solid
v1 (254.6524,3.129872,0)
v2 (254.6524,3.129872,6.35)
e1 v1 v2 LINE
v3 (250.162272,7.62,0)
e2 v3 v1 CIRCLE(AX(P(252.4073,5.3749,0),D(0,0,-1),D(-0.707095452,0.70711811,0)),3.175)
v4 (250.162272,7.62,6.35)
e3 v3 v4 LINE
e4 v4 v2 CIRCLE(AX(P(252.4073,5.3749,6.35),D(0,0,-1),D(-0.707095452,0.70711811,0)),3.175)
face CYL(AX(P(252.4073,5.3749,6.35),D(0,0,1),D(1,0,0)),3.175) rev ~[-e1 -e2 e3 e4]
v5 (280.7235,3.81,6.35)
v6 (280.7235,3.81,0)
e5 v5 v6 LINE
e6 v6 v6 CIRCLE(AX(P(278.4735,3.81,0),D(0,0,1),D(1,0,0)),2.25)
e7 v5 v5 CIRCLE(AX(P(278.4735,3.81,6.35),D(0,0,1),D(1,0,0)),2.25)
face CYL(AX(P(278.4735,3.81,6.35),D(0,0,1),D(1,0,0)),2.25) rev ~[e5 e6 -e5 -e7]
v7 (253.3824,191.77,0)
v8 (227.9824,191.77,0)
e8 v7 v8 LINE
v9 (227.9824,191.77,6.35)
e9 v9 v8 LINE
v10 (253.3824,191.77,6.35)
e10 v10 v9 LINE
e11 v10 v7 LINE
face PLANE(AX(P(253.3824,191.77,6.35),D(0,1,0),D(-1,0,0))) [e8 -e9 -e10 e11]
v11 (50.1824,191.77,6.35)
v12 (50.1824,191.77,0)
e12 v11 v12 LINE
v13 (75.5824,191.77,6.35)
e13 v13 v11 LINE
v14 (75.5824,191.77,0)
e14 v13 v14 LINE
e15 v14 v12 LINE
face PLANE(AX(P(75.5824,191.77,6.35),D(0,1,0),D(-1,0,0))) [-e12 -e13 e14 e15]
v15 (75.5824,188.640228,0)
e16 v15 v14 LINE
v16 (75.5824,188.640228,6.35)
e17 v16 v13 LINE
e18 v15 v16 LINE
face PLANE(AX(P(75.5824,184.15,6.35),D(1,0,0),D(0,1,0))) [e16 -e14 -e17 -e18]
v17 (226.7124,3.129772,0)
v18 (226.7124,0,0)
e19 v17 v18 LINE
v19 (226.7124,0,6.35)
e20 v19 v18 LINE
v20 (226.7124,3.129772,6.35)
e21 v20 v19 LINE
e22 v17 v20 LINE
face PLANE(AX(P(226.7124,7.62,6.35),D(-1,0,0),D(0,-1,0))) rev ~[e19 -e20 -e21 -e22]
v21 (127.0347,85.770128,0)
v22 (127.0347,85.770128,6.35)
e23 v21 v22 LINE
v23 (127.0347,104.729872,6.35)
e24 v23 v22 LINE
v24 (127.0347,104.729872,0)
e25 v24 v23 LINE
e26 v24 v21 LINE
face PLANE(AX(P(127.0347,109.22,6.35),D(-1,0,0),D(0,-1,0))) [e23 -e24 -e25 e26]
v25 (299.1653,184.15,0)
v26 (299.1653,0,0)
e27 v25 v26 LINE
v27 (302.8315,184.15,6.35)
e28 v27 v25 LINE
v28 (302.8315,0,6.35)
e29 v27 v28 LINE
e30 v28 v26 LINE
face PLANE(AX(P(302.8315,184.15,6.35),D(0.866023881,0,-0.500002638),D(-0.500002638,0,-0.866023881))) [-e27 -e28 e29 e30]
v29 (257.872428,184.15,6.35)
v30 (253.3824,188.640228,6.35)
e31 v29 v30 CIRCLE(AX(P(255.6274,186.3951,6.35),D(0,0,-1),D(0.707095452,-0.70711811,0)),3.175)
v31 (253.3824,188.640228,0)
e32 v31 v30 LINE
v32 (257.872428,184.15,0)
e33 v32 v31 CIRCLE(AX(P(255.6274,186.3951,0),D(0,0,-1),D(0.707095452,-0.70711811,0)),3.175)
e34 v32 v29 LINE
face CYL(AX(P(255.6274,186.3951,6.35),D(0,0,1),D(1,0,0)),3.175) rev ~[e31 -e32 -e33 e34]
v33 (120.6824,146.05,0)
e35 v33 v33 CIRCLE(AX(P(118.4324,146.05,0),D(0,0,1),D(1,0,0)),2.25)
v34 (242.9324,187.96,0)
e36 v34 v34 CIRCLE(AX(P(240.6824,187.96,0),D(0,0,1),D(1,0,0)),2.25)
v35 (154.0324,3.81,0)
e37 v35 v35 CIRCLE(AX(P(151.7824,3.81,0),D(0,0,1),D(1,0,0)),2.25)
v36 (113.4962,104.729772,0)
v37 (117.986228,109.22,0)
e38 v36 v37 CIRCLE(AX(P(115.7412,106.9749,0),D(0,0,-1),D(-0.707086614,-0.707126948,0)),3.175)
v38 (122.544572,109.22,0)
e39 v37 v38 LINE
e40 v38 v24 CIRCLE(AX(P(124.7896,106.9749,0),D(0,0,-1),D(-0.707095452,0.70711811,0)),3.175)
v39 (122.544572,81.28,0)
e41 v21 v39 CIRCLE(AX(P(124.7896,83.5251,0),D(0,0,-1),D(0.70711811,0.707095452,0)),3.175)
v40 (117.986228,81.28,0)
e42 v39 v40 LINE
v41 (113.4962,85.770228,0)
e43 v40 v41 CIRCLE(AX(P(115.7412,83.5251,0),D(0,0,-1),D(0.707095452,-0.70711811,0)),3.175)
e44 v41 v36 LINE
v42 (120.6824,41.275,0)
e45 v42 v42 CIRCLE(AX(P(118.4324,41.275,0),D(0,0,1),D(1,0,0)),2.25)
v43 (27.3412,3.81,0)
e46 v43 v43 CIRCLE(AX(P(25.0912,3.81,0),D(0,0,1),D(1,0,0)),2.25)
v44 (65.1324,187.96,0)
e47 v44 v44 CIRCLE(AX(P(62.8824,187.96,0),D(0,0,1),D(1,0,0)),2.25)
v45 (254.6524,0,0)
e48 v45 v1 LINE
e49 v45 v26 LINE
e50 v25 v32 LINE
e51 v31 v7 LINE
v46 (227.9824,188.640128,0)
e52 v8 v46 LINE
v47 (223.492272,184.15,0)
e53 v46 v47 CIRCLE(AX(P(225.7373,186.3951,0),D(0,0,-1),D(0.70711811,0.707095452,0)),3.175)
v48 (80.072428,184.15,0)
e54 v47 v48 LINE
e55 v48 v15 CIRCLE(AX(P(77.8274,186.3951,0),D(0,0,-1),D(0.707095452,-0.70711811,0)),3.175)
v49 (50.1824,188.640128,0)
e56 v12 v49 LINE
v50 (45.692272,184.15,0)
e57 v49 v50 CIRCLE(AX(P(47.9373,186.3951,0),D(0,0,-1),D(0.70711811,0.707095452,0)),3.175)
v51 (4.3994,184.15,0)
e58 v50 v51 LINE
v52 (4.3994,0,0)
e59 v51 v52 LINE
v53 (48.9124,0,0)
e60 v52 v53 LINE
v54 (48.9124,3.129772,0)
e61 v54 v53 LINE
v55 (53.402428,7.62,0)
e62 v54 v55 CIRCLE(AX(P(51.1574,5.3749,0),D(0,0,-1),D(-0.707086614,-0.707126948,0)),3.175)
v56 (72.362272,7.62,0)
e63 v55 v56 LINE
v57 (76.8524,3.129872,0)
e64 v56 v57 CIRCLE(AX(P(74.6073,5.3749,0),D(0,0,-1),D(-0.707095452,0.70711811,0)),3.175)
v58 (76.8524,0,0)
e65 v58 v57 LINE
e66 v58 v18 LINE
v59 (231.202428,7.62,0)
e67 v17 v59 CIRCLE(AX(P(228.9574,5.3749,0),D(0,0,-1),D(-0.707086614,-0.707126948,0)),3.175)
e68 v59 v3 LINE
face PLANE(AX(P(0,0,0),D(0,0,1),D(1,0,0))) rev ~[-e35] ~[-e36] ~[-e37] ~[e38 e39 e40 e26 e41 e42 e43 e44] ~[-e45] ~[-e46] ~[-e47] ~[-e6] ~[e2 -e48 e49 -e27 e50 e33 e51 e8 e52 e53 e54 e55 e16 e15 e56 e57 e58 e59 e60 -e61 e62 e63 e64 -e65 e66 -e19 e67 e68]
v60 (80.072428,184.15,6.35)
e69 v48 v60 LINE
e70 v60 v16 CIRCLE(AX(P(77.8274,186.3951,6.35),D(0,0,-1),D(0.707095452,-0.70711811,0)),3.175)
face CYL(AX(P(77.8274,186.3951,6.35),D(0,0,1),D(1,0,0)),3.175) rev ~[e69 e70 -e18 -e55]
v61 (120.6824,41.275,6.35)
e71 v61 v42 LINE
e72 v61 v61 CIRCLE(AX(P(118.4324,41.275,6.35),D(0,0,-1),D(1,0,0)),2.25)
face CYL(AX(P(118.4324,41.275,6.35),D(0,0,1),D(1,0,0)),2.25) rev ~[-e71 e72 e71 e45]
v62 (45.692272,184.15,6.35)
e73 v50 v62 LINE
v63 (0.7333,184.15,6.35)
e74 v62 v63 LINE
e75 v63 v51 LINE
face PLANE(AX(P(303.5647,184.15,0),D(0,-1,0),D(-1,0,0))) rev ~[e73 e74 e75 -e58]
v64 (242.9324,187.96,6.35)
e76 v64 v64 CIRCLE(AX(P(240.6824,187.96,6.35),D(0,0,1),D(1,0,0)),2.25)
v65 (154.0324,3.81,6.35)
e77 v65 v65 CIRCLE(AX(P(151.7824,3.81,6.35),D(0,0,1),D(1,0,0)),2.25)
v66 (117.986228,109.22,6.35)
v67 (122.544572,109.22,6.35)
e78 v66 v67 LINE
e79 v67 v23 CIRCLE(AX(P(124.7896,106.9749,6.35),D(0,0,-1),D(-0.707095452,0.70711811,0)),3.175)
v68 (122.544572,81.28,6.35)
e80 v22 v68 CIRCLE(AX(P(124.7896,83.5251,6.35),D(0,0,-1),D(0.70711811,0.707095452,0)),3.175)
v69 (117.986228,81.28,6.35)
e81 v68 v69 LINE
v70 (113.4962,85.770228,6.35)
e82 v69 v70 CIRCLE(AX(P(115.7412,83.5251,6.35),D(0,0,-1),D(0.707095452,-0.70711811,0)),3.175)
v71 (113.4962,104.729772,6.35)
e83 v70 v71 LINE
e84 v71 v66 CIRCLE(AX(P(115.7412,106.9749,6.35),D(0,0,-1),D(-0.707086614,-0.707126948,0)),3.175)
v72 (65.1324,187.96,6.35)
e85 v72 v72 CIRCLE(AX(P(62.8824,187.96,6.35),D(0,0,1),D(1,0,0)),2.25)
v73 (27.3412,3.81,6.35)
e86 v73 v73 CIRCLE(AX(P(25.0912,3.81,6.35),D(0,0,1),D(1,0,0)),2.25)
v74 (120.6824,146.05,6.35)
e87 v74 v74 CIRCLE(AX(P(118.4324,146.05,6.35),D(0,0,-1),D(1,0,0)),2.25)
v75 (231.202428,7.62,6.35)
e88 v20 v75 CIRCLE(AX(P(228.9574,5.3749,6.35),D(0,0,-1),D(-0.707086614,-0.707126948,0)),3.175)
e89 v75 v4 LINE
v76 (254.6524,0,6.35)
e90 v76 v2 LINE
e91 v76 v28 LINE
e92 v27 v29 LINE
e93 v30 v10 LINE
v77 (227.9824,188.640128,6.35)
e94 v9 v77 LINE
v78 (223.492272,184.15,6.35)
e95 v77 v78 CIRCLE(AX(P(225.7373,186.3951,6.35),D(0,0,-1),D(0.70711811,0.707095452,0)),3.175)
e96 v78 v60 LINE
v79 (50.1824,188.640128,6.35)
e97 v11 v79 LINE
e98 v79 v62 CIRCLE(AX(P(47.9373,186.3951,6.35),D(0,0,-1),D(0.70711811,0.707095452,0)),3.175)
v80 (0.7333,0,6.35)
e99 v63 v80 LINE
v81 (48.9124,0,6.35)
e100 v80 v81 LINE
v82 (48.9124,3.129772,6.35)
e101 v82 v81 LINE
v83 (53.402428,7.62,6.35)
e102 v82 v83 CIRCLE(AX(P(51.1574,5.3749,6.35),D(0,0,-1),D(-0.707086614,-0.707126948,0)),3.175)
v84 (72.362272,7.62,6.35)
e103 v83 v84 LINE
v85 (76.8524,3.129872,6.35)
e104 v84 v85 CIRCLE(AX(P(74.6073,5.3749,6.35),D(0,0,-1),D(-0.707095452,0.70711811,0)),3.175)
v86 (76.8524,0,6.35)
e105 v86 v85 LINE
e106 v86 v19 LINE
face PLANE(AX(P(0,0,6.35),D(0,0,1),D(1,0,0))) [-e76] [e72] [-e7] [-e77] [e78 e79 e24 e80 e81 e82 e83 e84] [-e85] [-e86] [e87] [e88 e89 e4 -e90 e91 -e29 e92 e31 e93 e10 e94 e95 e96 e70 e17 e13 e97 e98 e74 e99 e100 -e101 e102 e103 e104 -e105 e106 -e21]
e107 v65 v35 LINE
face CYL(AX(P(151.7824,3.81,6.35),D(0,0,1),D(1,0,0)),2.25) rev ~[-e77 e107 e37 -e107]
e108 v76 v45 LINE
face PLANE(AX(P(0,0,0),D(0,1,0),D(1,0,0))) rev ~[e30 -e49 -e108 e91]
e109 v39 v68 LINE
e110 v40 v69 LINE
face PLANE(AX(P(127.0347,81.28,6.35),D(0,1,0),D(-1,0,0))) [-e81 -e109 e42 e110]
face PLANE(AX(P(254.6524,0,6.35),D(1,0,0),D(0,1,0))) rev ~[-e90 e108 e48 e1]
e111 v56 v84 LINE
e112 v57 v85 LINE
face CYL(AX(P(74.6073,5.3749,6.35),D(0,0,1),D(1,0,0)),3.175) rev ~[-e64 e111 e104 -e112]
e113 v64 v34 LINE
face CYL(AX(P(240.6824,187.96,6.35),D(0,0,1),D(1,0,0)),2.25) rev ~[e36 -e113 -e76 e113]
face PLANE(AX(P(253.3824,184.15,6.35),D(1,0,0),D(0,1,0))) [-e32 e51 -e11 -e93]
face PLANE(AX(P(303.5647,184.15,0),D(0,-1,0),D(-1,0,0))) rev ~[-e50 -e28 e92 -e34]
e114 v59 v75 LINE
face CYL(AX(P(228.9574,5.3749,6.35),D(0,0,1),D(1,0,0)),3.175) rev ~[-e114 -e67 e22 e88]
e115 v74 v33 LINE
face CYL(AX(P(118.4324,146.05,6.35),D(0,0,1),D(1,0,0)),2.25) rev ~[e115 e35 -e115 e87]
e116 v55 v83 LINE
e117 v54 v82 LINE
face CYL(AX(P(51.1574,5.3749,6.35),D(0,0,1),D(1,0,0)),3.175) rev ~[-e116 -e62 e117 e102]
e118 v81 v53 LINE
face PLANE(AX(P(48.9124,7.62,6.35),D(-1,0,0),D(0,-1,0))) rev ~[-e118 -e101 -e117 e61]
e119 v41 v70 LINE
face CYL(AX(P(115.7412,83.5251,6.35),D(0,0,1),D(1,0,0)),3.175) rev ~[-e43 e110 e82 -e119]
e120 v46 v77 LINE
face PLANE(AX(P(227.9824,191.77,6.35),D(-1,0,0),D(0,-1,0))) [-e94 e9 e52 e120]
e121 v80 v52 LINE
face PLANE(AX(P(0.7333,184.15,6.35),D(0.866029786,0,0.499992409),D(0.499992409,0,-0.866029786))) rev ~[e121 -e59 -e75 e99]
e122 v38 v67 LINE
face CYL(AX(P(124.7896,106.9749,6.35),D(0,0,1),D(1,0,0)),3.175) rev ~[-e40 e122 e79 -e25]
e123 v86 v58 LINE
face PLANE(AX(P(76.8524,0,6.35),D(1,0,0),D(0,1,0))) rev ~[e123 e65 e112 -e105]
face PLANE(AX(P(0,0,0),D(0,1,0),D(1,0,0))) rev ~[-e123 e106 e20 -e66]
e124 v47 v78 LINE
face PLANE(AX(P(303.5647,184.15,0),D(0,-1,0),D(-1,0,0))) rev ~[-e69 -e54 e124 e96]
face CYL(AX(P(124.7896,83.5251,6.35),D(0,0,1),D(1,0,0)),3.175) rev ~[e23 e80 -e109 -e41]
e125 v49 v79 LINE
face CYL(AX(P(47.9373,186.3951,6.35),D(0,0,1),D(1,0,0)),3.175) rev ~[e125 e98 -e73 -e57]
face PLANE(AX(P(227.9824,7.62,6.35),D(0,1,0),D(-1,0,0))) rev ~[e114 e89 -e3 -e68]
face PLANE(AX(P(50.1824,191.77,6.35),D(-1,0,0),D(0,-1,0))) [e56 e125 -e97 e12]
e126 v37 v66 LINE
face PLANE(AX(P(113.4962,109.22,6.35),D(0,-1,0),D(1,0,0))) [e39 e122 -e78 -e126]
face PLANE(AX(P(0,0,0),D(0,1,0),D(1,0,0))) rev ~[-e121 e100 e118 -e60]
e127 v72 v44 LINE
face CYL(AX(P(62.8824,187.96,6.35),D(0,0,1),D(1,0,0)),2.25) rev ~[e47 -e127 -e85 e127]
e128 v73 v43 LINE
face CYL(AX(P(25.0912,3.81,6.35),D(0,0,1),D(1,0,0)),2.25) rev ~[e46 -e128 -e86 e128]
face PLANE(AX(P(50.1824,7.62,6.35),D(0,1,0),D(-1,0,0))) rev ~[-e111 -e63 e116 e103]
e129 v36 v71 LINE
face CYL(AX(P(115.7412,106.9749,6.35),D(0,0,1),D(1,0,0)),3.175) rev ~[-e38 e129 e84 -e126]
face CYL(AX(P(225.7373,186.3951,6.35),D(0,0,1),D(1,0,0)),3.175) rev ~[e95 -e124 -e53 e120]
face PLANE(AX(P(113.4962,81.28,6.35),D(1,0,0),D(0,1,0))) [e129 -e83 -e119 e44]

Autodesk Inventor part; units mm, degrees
ref_plane "YZ Plane" through (0, 0, 0) normal (1, 0, 0) x (0, 1, 0)
sketch "Sketch1" plane through (0, 0, 0) normal (0, 0, 1) x (1, 0, 0)
  line L0 (0, 0) -> (303.5647, 0)
  line L1 (303.5647, 0) -> (303.5647, 184.15)
  line L2 (303.5647, 184.15) -> (0, 184.15)
  line L3 (0, 184.15) -> (0, 0)
  dimension "d0" = 303.5647
  dimension "d1" = 184.15
extrude "Extrusion1" add sketch "Sketch1" along normal blind 6.35
sketch "Sketch2" plane through (0, 184.15, 0) normal (0, 1, 0) x (1, 0, 0)
  line L0 (0, -6.35) -> (303.5647, -6.35) projected
  line L1 (0, -6.35) -> (3.6662, 0)
  line L2 (3.6662, 0) -> (0, 0)
  line L3 (0, 0) -> (0, -6.35)
  line L4 (0, 0) -> (303.5647, 0) projected
  line L5 (303.5647, 0) -> (303.5647, -6.35) projected
  line L6 (299.8985, 0) -> (303.5647, -6.35)
  line L7 (303.5647, -6.35) -> (303.5647, 0)
  line L8 (303.5647, 0) -> (299.8985, 0)
  dimension "d4" = 30
  dimension "d5" = 30
extrude "Extrusion2" cut sketch "Sketch2" against normal through all contours L3 L2 L1 | L6 L4 L5
ref_plane "Work Plane1" through (3.6662, 92.075, 0) normal (0, -1, 0) x (1, 0, 0)
sketch "Sketch4" plane through (3.6662, 92.075, 0) normal (0, -1, 0) x (1, 0, 0)
  line L0 (0, 0) -> (296.2324, 0) projected
  line L1 (118.4324, 0) -> (129.4309, 6.35) construction
  line L2 (129.4309, 6.35) -> (116.7309, 6.35) construction
  line L3 (-3.6662, 6.35) -> (299.8985, 6.35) projected
  line L4 (118.4324, 0) -> (111.1, 0)
  line L5 (118.0728, 4.0257) -> (111.1, 0) construction
  line L6 (-3.6662, 6.35) -> (0, 0) projected
  line L7 (118.4324, 0) -> (122.0985, 6.35)
  line L8 (111.1, 0) -> (114.7662, 6.35)
  line L9 (122.0985, 6.35) -> (114.7662, 6.35)
  point P0 (-3.6662, 0)
  dimension "d13" = 88.9
  dimension "d14" = 30
  dimension "d15" = 60
  dimension "d16" = 6.35
extrude "Extrusion3" cut sketch "Sketch4" along normal blind 9.525 and the other way blind 15.875 contours L8 L3 L7 L0
sketch "Sketch5" plane through (0, 0, 6.35) normal (0, 0, 1) x (1, 0, 0)
  line L0 (3.6662, 0) -> (299.8985, 0) projected
  line L1 (50.1824, 0) -> (75.5824, 0)
  line L2 (75.5824, 0) -> (75.5824, 7.62)
  line L3 (75.5824, 7.62) -> (50.1824, 7.62)
  line L4 (50.1824, 7.62) -> (50.1824, 0)
  line L5 (227.9824, 0) -> (253.3824, 0)
  line L6 (253.3824, 0) -> (253.3824, 7.62)
  line L7 (253.3824, 7.62) -> (227.9824, 7.62)
  line L8 (227.9824, 7.62) -> (227.9824, 0)
  line L9 (75.5824, 7.62) -> (227.9824, 7.62) construction
  point P0 (0, 0)
  point P1 (151.7824, 7.62)
  point P2 (151.7824, 0)
  dimension "d19" = 25.4
  dimension "d20" = 7.62
  dimension "d21" = 25.4
  dimension "d22" = 7.62
  dimension "d23" = 152.4
extrude "Extrusion4" cut sketch "Sketch5" against normal through all
sketch "Sketch6" plane through (0, 0, 6.35) normal (0, 0, 1) x (1, 0, 0)
  line L0 (299.8985, 184.15) -> (3.6662, 184.15) projected
  line L1 (50.1824, 184.15) -> (75.5824, 184.15)
  line L2 (75.5824, 184.15) -> (75.5824, 191.77)
  line L3 (75.5824, 191.77) -> (50.1824, 191.77)
  line L4 (50.1824, 191.77) -> (50.1824, 184.15)
  line L5 (50.1824, 7.62) -> (75.5824, 7.62) projected
  line L6 (227.9824, 184.15) -> (253.3824, 184.15)
  line L7 (253.3824, 184.15) -> (253.3824, 191.77)
  line L8 (253.3824, 191.77) -> (227.9824, 191.77)
  line L9 (227.9824, 191.77) -> (227.9824, 184.15)
  line L10 (227.9824, 7.62) -> (253.3824, 7.62) projected
  point P0 (0, 0)
  point P1 (62.8824, 191.77)
  point P2 (62.8824, 7.62)
  point P3 (240.6824, 191.77)
  point P4 (240.6824, 7.62)
  dimension "d26" = 25.4
  dimension "d27" = 7.62
  dimension "d28" = 25.4
  dimension "d29" = 7.62
extrude "Extrusion5" add sketch "Sketch6" against normal blind 6.35
ref_plane "Work Plane2" through (125.7647, 92.075, 6.35) normal (-0.5, 0, -0.8660254) x (0, -1, 0)
sketch "Sketch7" plane through (125.7647, 92.075, 6.35) normal (-0.5, 0, -0.8660254) x (0, -1, 0)
  line L0 (-15.875, 6.35) -> (-15.875, 0) projected
  line L1 (-15.875, 3.175) -> (-92.075, 3.175) construction
  line L2 (-92.075, -88.5231) -> (-92.075, 43.4592) projected
  line L3 (9.525, 0) -> (9.525, 6.35) projected
  line L4 (9.525, 3.175) -> (92.075, 3.175) construction
  line L5 (92.075, 43.4592) -> (92.075, -88.5231) projected
  circle A0 centre (-53.975, 3.175) radius 2.25
  circle A1 centre (50.8, 3.175) radius 2.25
  point P0 (92.075, 105.7404)
  dimension "d33" = 4.5
  dimension "d34" = 4.5
extrude "Extrusion6" cut sketch "Sketch7" along normal through all
sketch "Sketch8" plane through (0, 0, 6.35) normal (0, 0, 1) x (1, 0, 0)
  circle A0 centre (62.8824, 187.96) radius 2.25
  circle A1 centre (240.6824, 187.96) radius 2.25
  circle A2 centre (278.4735, 3.81) radius 2.25
  circle A3 centre (151.7824, 3.81) radius 2.25
  circle A4 centre (25.0912, 3.81) radius 2.25
  line L0 (0, 0) -> (50.1824, 0) projected
  line L1 (75.5824, 0) -> (227.9824, 0) projected
  line L2 (253.3824, 0) -> (303.5647, 0) projected
  line L3 (50.1824, 0) -> (50.1824, 7.62) projected
  line L4 (253.3824, 184.15) -> (253.3824, 191.77) projected
  line L5 (75.5824, 191.77) -> (50.1824, 191.77) projected
  line L6 (253.3824, 191.77) -> (227.9824, 191.77) projected
  point P0 (25.0912, 0)
  point P1 (151.7824, 0)
  point P2 (278.4735, 0)
  point P3 (50.1824, 3.81)
  point P4 (253.3824, 187.96)
  point P5 (62.8824, 191.77)
  point P6 (240.6824, 191.77)
  dimension "d37" = 4.5
  dimension "d38" = 4.5
  dimension "d39" = 4.5
  dimension "d40" = 4.5
  dimension "d41" = 4.5
extrude "Extrusion7" cut sketch "Sketch8" against normal through all
sketch "Sketch9" plane through (0, 0, 0) normal (0, 0, -1) x (-1, 0, 0)
  ellipse E0 centre (-118.4324, 41.275) end of major axis (-121.0304, 41.275) minor radius 2.25 projected
  line L0 (-114.7662, 107.95) -> (-114.7662, 82.55) projected
  line L1 (-114.7662, 107.95) -> (-118.4324, 107.95) projected
  line L2 (-118.4324, 82.55) -> (-118.4324, 107.95) projected
  line L3 (-118.4324, 82.55) -> (-114.7662, 82.55) projected
  ellipse E1 centre (-118.4324, 146.05) end of major axis (-121.0304, 146.05) minor radius 2.25 projected
  point P0 (0, 0)
extrude "Extrusion8" cut sketch "Sketch9" along normal through all both and the other way through all
sketch "Sketch10" plane through (0, 0, 6.35) normal (0, 0, 1) x (1, 0, 0)
  ellipse E0 centre (118.4324, 146.05) end of major axis (115.8343, 146.05) minor radius 2.25 (118.4324, 143.8) -> (120.2654, 144.4555) ccw projected
  ellipse E1 centre (122.0985, 146.05) end of major axis (124.6966, 146.05) minor radius 2.25 (120.2654, 144.4555) -> (120.2654, 147.6445) ccw projected
  ellipse E2 centre (118.4324, 146.05) end of major axis (115.8343, 146.05) minor radius 2.25 (120.2654, 147.6445) -> (118.4324, 148.3) ccw projected
  ellipse E3 centre (118.4324, 146.05) end of major axis (121.0304, 146.05) minor radius 2.25 (118.4324, 143.8) -> (118.4324, 148.3) ccw projected
  ellipse E4 centre (118.4324, 41.275) end of major axis (115.8343, 41.275) minor radius 2.25 (118.4324, 39.025) -> (120.2654, 39.6805) ccw projected
  ellipse E5 centre (122.0985, 41.275) end of major axis (124.6966, 41.275) minor radius 2.25 (120.2654, 39.6805) -> (120.2654, 42.8695) ccw projected
  ellipse E6 centre (118.4324, 41.275) end of major axis (115.8343, 41.275) minor radius 2.25 (120.2654, 42.8695) -> (118.4324, 43.525) ccw projected
  ellipse E7 centre (118.4324, 41.275) end of major axis (121.0304, 41.275) minor radius 2.25 (118.4324, 39.025) -> (118.4324, 43.525) ccw projected
  line L0 (125.7647, 107.95) -> (125.7647, 82.55) projected
  line L1 (125.7647, 107.95) -> (122.0985, 107.95) projected
  line L2 (122.0985, 82.55) -> (122.0985, 107.95) projected
  line L3 (122.0985, 82.55) -> (125.7647, 82.55) projected
  point P0 (0, 0)
extrude "Extrusion9" cut sketch "Sketch10" against normal through all contours L0 L3 L2 L1
sketch "Sketch11" plane through (0, 0, 6.35) normal (0, 0, 1) x (1, 0, 0)
  ellipse E0 centre (118.4324, 146.05) end of major axis (115.8343, 146.05) minor radius 2.25 (120.2654, 147.6445) -> (120.2654, 144.4555) ccw projected
  ellipse E1 centre (118.4324, 41.275) end of major axis (115.8343, 41.275) minor radius 2.25 (120.2654, 42.8695) -> (120.2654, 39.6805) ccw projected
  circle A0 centre (118.4324, 41.275) radius 2.25
  circle A1 centre (118.4324, 146.05) radius 2.25
  circle A2 centre (118.4324, 146.05) radius 7.5
  circle A3 centre (118.4324, 41.275) radius 7.5
  point P0 (0, 0)
  dimension "d48" = 4.5
  dimension "d49" = 4.5
  dimension "d50" = 15
  dimension "d51" = 15
extrude "Extrusion10" add sketch "Sketch11" against normal up to surface (6.35 mm away) from surface at 0 contours A1 E0 | A0 E1 | A2 | A3
sketch "Sketch12" plane through (0, 0, 6.35) normal (0, 0, 1) x (1, 0, 0)
  line L0 (3.6662, 0) -> (50.1824, 0) projected
  line L1 (48.9124, 0) -> (76.8524, 0)
  line L2 (76.8524, 0) -> (76.8524, 7.62)
  line L3 (76.8524, 7.62) -> (48.9124, 7.62)
  line L4 (48.9124, 7.62) -> (48.9124, 0)
  line L5 (75.5824, 0) -> (227.9824, 0) projected
  line L6 (226.7124, 0) -> (254.6524, 0)
  line L7 (254.6524, 0) -> (254.6524, 7.62)
  line L8 (254.6524, 7.62) -> (226.7124, 7.62)
  line L9 (226.7124, 7.62) -> (226.7124, 0)
  line L10 (50.1824, 7.62) -> (75.5824, 7.62) projected
  line L11 (227.9824, 7.62) -> (253.3824, 7.62) projected
  line L12 (50.1824, 0) -> (50.1824, 7.62) projected
  line L13 (227.9824, 0) -> (227.9824, 7.62) projected
  line L14 (114.7662, 107.95) -> (125.7647, 107.95) projected
  line L15 (114.7662, 82.55) -> (114.7662, 107.95) projected
  line L16 (125.7647, 82.55) -> (114.7662, 82.55) projected
  line L17 (125.7647, 107.95) -> (125.7647, 82.55) projected
  line L18 (113.4962, 109.22) -> (127.0347, 109.22)
  line L19 (127.0347, 109.22) -> (127.0347, 81.28)
  line L20 (127.0347, 81.28) -> (113.4962, 81.28)
  line L21 (113.4962, 81.28) -> (113.4962, 109.22)
  point P0 (0, 0)
  point P1 (62.8824, 7.62)
  point P2 (240.6824, 7.62)
  dimension "d54" = 1.27
  dimension "d55" = 1.27
  dimension "d56" = 1.27
extrude "Extrusion11" cut sketch "Sketch12" against normal through all contours L4 L3 L12 L0 | L12 L3 L2 L1 | L9 L8 L13 L5 | L13 L8 L7 L6 | L14 L17 L16 L15 | L18 L19 L20 L21
sketch "Sketch13" plane through (0, 0, 6.35) normal (0, 0, 1) x (1, 0, 0)
  line L0 (254.6524, 7.62) -> (254.6524, 0) construction
  line L1 (254.6524, 0) -> (303.5647, 0) construction
  line L2 (303.5647, 0) -> (303.5647, 184.15) construction
  line L3 (303.5647, 184.15) -> (253.3824, 184.15) construction
  line L4 (253.3824, 184.15) -> (253.3824, 191.77) construction
  line L5 (253.3824, 191.77) -> (227.9824, 191.77) construction
  line L6 (227.9824, 191.77) -> (227.9824, 184.15) construction
  line L7 (227.9824, 184.15) -> (75.5824, 184.15) construction
  line L8 (75.5824, 184.15) -> (75.5824, 191.77) construction
  line L9 (75.5824, 191.77) -> (50.1824, 191.77) construction
  line L10 (50.1824, 191.77) -> (50.1824, 184.15) construction
  line L11 (50.1824, 184.15) -> (0, 184.15) construction
  line L12 (0, 184.15) -> (0, 0) construction
  line L13 (0, 0) -> (48.9124, 0) construction
  line L14 (48.9124, 0) -> (48.9124, 7.62) construction
  line L15 (48.9124, 7.62) -> (76.8524, 7.62) construction
  line L16 (76.8524, 7.62) -> (76.8524, 0) construction
  line L17 (76.8524, 0) -> (226.7124, 0) construction
  line L18 (226.7124, 0) -> (226.7124, 7.62) construction
  line L19 (226.7124, 7.62) -> (254.6524, 7.62) construction
  line L20 (113.4962, 81.28) -> (113.4962, 109.22) construction
  line L21 (113.4962, 109.22) -> (127.0347, 109.22) construction
  line L22 (127.0347, 109.22) -> (127.0347, 81.28) construction
  line L23 (127.0347, 81.28) -> (113.4962, 81.28) construction
  circle A0 centre (118.4324, 146.05) radius 2.25 construction
  circle A1 centre (118.4324, 41.275) radius 2.25 construction
  circle A2 centre (25.0912, 3.81) radius 2.25 construction
  circle A3 centre (278.4735, 3.81) radius 2.25 construction
  circle A4 centre (62.8824, 187.96) radius 2.25 construction
  circle A5 centre (240.6824, 187.96) radius 2.25 construction
  circle A6 centre (151.7824, 3.81) radius 2.25 construction
  line L24 (77.8274, 186.3951) -> (225.7373, 186.3951) construction
  line L25 (225.7373, 186.3951) -> (225.7373, 194.0151) construction
  line L26 (225.7373, 194.0151) -> (255.6274, 194.0151) construction
  line L27 (255.6274, 194.0151) -> (255.6274, 186.3951) construction
  line L28 (255.6274, 186.3951) -> (305.8098, 186.3951) construction
  line L29 (305.8098, 186.3951) -> (305.8098, -2.2451) construction
  line L30 (305.8098, -2.2451) -> (252.4073, -2.2451) construction
  line L31 (252.4073, -2.2451) -> (252.4073, 5.3749) construction
  line L32 (252.4073, 5.3749) -> (228.9574, 5.3749) construction
  line L33 (228.9574, 5.3749) -> (228.9574, -2.2451) construction
  line L34 (228.9574, -2.2451) -> (74.6073, -2.2451) construction
  line L35 (74.6073, -2.2451) -> (74.6073, 5.3749) construction
  line L36 (74.6073, 5.3749) -> (51.1574, 5.3749) construction
  line L37 (51.1574, 5.3749) -> (51.1574, -2.2451) construction
  line L38 (51.1574, -2.2451) -> (-2.2451, -2.2451) construction
  line L39 (-2.2451, -2.2451) -> (-2.2451, 186.3951) construction
  line L40 (-2.2451, 186.3951) -> (47.9373, 186.3951) construction
  line L41 (47.9373, 186.3951) -> (47.9373, 194.0151) construction
  line L42 (47.9373, 194.0151) -> (77.8274, 194.0151) construction
  line L43 (77.8274, 194.0151) -> (77.8274, 186.3951) construction
  circle A7 centre (47.9373, 186.3951) radius 3.175
  circle A8 centre (77.8274, 186.3951) radius 3.175
  circle A9 centre (225.7373, 186.3951) radius 3.175
  circle A10 centre (255.6274, 186.3951) radius 3.175
  circle A11 centre (252.4073, 5.3749) radius 3.175
  line L44 (226.7124, 7.62) -> (254.6524, 7.62) projected
  circle A12 centre (228.9574, 5.3749) radius 3.175
  line L45 (48.9124, 7.62) -> (76.8524, 7.62) projected
  circle A13 centre (74.6073, 5.3749) radius 3.175
  circle A14 centre (51.1574, 5.3749) radius 3.175
  line L46 (115.7412, 106.9749) -> (115.7412, 83.5251) construction
  line L47 (115.7412, 83.5251) -> (124.7896, 83.5251) construction
  line L48 (124.7896, 83.5251) -> (124.7896, 106.9749) construction
  line L49 (124.7896, 106.9749) -> (115.7412, 106.9749) construction
  line L50 (113.4962, 109.22) -> (113.4962, 81.28) projected
  circle A15 centre (115.7412, 106.9749) radius 3.175
  circle A16 centre (124.7896, 106.9749) radius 3.175
  line L51 (127.0347, 81.28) -> (127.0347, 109.22) projected
  circle A17 centre (124.7896, 83.5251) radius 3.175
  circle A18 centre (115.7412, 83.5251) radius 3.175
  dimension "d59" = 6.35
  dimension "d60" = 6.35
extrude "Extrusion12" cut sketch "Sketch13" along normal through all both and the other way through all
sketch "Sketch14" plane through (80.0725, 184.15, 0) normal (0, 1, 0) x (1, 0, 0)
  line L0 (-76.4063, 0) -> (-80.0725, -6.35) projected
  line L1 (-80.0725, -6.35) -> (-79.3392, -6.35)
  line L2 (-80.0725, -6.35) -> (-31.1601, -6.35) construction
  line L3 (-79.3392, -6.35) -> (-75.6731, 0)
  line L4 (-76.4063, 0) -> (-31.1601, 0) construction
  line L5 (-75.6731, 0) -> (-76.4063, 0)
  line L6 (174.5799, -6.35) -> (223.4922, -6.35) construction
  line L7 (223.4922, -6.35) -> (222.759, -6.35)
  line L8 (222.759, -6.35) -> (219.0928, 0)
  line L9 (219.8261, 0) -> (177.8, 0) construction
  line L10 (219.0928, 0) -> (219.8261, 0)
  line L11 (223.4922, -6.35) -> (219.8261, 0) projected
  line L12 (219.8261, 0) -> (223.4922, -6.35)
  point P0 (-80.0725, 0)
  dimension "d63" = 0.635
  dimension "d64" = 0.635
extrude "Extrusion13" cut sketch "Sketch14" against normal through all
equation "\"d2\" = Panel_Thickness"
equation "\"d16\" = Panel_Thickness"
equation "\"d20\" = Panel_Thickness + Fit_Tolerance"
equation "\"d22\" = Panel_Thickness + Fit_Tolerance"
equation "\"d27\" = Panel_Thickness + Fit_Tolerance"
equation "\"d29\" = Panel_Thickness + Fit_Tolerance"
equation "\"d30\" = Panel_Thickness"
equation "\"d35\" = Panel_Thickness"
equation "\"d42\" = Panel_Thickness"
equation "\"d46\" = Panel_Thickness"
equation "\"d52\" = Panel_Thickness"
equation "\"d54\" = Fit_Tolerance"
equation "\"d55\" = Fit_Tolerance"
equation "\"d56\" = Fit_Tolerance"
equation "\"d57\" = Panel_Thickness"
equation "\"d59\" = Tool_Dia"
equation "\"d60\" = Tool_Dia"
equation "\"d63\" = 0.5 * Fit_Tolerance"
equation "\"d64\" = 0.5 * Fit_Tolerance"
equation "\"d65\" = Panel_Thickness"
equation "\"Panel_Thickness\" = 6.35"
equation "\"Fit_Tolerance\" = 1.27"
equation "\"Tool_Dia\" = 6.35"
properties part number "BA14" material "Wood (Cherry)"
